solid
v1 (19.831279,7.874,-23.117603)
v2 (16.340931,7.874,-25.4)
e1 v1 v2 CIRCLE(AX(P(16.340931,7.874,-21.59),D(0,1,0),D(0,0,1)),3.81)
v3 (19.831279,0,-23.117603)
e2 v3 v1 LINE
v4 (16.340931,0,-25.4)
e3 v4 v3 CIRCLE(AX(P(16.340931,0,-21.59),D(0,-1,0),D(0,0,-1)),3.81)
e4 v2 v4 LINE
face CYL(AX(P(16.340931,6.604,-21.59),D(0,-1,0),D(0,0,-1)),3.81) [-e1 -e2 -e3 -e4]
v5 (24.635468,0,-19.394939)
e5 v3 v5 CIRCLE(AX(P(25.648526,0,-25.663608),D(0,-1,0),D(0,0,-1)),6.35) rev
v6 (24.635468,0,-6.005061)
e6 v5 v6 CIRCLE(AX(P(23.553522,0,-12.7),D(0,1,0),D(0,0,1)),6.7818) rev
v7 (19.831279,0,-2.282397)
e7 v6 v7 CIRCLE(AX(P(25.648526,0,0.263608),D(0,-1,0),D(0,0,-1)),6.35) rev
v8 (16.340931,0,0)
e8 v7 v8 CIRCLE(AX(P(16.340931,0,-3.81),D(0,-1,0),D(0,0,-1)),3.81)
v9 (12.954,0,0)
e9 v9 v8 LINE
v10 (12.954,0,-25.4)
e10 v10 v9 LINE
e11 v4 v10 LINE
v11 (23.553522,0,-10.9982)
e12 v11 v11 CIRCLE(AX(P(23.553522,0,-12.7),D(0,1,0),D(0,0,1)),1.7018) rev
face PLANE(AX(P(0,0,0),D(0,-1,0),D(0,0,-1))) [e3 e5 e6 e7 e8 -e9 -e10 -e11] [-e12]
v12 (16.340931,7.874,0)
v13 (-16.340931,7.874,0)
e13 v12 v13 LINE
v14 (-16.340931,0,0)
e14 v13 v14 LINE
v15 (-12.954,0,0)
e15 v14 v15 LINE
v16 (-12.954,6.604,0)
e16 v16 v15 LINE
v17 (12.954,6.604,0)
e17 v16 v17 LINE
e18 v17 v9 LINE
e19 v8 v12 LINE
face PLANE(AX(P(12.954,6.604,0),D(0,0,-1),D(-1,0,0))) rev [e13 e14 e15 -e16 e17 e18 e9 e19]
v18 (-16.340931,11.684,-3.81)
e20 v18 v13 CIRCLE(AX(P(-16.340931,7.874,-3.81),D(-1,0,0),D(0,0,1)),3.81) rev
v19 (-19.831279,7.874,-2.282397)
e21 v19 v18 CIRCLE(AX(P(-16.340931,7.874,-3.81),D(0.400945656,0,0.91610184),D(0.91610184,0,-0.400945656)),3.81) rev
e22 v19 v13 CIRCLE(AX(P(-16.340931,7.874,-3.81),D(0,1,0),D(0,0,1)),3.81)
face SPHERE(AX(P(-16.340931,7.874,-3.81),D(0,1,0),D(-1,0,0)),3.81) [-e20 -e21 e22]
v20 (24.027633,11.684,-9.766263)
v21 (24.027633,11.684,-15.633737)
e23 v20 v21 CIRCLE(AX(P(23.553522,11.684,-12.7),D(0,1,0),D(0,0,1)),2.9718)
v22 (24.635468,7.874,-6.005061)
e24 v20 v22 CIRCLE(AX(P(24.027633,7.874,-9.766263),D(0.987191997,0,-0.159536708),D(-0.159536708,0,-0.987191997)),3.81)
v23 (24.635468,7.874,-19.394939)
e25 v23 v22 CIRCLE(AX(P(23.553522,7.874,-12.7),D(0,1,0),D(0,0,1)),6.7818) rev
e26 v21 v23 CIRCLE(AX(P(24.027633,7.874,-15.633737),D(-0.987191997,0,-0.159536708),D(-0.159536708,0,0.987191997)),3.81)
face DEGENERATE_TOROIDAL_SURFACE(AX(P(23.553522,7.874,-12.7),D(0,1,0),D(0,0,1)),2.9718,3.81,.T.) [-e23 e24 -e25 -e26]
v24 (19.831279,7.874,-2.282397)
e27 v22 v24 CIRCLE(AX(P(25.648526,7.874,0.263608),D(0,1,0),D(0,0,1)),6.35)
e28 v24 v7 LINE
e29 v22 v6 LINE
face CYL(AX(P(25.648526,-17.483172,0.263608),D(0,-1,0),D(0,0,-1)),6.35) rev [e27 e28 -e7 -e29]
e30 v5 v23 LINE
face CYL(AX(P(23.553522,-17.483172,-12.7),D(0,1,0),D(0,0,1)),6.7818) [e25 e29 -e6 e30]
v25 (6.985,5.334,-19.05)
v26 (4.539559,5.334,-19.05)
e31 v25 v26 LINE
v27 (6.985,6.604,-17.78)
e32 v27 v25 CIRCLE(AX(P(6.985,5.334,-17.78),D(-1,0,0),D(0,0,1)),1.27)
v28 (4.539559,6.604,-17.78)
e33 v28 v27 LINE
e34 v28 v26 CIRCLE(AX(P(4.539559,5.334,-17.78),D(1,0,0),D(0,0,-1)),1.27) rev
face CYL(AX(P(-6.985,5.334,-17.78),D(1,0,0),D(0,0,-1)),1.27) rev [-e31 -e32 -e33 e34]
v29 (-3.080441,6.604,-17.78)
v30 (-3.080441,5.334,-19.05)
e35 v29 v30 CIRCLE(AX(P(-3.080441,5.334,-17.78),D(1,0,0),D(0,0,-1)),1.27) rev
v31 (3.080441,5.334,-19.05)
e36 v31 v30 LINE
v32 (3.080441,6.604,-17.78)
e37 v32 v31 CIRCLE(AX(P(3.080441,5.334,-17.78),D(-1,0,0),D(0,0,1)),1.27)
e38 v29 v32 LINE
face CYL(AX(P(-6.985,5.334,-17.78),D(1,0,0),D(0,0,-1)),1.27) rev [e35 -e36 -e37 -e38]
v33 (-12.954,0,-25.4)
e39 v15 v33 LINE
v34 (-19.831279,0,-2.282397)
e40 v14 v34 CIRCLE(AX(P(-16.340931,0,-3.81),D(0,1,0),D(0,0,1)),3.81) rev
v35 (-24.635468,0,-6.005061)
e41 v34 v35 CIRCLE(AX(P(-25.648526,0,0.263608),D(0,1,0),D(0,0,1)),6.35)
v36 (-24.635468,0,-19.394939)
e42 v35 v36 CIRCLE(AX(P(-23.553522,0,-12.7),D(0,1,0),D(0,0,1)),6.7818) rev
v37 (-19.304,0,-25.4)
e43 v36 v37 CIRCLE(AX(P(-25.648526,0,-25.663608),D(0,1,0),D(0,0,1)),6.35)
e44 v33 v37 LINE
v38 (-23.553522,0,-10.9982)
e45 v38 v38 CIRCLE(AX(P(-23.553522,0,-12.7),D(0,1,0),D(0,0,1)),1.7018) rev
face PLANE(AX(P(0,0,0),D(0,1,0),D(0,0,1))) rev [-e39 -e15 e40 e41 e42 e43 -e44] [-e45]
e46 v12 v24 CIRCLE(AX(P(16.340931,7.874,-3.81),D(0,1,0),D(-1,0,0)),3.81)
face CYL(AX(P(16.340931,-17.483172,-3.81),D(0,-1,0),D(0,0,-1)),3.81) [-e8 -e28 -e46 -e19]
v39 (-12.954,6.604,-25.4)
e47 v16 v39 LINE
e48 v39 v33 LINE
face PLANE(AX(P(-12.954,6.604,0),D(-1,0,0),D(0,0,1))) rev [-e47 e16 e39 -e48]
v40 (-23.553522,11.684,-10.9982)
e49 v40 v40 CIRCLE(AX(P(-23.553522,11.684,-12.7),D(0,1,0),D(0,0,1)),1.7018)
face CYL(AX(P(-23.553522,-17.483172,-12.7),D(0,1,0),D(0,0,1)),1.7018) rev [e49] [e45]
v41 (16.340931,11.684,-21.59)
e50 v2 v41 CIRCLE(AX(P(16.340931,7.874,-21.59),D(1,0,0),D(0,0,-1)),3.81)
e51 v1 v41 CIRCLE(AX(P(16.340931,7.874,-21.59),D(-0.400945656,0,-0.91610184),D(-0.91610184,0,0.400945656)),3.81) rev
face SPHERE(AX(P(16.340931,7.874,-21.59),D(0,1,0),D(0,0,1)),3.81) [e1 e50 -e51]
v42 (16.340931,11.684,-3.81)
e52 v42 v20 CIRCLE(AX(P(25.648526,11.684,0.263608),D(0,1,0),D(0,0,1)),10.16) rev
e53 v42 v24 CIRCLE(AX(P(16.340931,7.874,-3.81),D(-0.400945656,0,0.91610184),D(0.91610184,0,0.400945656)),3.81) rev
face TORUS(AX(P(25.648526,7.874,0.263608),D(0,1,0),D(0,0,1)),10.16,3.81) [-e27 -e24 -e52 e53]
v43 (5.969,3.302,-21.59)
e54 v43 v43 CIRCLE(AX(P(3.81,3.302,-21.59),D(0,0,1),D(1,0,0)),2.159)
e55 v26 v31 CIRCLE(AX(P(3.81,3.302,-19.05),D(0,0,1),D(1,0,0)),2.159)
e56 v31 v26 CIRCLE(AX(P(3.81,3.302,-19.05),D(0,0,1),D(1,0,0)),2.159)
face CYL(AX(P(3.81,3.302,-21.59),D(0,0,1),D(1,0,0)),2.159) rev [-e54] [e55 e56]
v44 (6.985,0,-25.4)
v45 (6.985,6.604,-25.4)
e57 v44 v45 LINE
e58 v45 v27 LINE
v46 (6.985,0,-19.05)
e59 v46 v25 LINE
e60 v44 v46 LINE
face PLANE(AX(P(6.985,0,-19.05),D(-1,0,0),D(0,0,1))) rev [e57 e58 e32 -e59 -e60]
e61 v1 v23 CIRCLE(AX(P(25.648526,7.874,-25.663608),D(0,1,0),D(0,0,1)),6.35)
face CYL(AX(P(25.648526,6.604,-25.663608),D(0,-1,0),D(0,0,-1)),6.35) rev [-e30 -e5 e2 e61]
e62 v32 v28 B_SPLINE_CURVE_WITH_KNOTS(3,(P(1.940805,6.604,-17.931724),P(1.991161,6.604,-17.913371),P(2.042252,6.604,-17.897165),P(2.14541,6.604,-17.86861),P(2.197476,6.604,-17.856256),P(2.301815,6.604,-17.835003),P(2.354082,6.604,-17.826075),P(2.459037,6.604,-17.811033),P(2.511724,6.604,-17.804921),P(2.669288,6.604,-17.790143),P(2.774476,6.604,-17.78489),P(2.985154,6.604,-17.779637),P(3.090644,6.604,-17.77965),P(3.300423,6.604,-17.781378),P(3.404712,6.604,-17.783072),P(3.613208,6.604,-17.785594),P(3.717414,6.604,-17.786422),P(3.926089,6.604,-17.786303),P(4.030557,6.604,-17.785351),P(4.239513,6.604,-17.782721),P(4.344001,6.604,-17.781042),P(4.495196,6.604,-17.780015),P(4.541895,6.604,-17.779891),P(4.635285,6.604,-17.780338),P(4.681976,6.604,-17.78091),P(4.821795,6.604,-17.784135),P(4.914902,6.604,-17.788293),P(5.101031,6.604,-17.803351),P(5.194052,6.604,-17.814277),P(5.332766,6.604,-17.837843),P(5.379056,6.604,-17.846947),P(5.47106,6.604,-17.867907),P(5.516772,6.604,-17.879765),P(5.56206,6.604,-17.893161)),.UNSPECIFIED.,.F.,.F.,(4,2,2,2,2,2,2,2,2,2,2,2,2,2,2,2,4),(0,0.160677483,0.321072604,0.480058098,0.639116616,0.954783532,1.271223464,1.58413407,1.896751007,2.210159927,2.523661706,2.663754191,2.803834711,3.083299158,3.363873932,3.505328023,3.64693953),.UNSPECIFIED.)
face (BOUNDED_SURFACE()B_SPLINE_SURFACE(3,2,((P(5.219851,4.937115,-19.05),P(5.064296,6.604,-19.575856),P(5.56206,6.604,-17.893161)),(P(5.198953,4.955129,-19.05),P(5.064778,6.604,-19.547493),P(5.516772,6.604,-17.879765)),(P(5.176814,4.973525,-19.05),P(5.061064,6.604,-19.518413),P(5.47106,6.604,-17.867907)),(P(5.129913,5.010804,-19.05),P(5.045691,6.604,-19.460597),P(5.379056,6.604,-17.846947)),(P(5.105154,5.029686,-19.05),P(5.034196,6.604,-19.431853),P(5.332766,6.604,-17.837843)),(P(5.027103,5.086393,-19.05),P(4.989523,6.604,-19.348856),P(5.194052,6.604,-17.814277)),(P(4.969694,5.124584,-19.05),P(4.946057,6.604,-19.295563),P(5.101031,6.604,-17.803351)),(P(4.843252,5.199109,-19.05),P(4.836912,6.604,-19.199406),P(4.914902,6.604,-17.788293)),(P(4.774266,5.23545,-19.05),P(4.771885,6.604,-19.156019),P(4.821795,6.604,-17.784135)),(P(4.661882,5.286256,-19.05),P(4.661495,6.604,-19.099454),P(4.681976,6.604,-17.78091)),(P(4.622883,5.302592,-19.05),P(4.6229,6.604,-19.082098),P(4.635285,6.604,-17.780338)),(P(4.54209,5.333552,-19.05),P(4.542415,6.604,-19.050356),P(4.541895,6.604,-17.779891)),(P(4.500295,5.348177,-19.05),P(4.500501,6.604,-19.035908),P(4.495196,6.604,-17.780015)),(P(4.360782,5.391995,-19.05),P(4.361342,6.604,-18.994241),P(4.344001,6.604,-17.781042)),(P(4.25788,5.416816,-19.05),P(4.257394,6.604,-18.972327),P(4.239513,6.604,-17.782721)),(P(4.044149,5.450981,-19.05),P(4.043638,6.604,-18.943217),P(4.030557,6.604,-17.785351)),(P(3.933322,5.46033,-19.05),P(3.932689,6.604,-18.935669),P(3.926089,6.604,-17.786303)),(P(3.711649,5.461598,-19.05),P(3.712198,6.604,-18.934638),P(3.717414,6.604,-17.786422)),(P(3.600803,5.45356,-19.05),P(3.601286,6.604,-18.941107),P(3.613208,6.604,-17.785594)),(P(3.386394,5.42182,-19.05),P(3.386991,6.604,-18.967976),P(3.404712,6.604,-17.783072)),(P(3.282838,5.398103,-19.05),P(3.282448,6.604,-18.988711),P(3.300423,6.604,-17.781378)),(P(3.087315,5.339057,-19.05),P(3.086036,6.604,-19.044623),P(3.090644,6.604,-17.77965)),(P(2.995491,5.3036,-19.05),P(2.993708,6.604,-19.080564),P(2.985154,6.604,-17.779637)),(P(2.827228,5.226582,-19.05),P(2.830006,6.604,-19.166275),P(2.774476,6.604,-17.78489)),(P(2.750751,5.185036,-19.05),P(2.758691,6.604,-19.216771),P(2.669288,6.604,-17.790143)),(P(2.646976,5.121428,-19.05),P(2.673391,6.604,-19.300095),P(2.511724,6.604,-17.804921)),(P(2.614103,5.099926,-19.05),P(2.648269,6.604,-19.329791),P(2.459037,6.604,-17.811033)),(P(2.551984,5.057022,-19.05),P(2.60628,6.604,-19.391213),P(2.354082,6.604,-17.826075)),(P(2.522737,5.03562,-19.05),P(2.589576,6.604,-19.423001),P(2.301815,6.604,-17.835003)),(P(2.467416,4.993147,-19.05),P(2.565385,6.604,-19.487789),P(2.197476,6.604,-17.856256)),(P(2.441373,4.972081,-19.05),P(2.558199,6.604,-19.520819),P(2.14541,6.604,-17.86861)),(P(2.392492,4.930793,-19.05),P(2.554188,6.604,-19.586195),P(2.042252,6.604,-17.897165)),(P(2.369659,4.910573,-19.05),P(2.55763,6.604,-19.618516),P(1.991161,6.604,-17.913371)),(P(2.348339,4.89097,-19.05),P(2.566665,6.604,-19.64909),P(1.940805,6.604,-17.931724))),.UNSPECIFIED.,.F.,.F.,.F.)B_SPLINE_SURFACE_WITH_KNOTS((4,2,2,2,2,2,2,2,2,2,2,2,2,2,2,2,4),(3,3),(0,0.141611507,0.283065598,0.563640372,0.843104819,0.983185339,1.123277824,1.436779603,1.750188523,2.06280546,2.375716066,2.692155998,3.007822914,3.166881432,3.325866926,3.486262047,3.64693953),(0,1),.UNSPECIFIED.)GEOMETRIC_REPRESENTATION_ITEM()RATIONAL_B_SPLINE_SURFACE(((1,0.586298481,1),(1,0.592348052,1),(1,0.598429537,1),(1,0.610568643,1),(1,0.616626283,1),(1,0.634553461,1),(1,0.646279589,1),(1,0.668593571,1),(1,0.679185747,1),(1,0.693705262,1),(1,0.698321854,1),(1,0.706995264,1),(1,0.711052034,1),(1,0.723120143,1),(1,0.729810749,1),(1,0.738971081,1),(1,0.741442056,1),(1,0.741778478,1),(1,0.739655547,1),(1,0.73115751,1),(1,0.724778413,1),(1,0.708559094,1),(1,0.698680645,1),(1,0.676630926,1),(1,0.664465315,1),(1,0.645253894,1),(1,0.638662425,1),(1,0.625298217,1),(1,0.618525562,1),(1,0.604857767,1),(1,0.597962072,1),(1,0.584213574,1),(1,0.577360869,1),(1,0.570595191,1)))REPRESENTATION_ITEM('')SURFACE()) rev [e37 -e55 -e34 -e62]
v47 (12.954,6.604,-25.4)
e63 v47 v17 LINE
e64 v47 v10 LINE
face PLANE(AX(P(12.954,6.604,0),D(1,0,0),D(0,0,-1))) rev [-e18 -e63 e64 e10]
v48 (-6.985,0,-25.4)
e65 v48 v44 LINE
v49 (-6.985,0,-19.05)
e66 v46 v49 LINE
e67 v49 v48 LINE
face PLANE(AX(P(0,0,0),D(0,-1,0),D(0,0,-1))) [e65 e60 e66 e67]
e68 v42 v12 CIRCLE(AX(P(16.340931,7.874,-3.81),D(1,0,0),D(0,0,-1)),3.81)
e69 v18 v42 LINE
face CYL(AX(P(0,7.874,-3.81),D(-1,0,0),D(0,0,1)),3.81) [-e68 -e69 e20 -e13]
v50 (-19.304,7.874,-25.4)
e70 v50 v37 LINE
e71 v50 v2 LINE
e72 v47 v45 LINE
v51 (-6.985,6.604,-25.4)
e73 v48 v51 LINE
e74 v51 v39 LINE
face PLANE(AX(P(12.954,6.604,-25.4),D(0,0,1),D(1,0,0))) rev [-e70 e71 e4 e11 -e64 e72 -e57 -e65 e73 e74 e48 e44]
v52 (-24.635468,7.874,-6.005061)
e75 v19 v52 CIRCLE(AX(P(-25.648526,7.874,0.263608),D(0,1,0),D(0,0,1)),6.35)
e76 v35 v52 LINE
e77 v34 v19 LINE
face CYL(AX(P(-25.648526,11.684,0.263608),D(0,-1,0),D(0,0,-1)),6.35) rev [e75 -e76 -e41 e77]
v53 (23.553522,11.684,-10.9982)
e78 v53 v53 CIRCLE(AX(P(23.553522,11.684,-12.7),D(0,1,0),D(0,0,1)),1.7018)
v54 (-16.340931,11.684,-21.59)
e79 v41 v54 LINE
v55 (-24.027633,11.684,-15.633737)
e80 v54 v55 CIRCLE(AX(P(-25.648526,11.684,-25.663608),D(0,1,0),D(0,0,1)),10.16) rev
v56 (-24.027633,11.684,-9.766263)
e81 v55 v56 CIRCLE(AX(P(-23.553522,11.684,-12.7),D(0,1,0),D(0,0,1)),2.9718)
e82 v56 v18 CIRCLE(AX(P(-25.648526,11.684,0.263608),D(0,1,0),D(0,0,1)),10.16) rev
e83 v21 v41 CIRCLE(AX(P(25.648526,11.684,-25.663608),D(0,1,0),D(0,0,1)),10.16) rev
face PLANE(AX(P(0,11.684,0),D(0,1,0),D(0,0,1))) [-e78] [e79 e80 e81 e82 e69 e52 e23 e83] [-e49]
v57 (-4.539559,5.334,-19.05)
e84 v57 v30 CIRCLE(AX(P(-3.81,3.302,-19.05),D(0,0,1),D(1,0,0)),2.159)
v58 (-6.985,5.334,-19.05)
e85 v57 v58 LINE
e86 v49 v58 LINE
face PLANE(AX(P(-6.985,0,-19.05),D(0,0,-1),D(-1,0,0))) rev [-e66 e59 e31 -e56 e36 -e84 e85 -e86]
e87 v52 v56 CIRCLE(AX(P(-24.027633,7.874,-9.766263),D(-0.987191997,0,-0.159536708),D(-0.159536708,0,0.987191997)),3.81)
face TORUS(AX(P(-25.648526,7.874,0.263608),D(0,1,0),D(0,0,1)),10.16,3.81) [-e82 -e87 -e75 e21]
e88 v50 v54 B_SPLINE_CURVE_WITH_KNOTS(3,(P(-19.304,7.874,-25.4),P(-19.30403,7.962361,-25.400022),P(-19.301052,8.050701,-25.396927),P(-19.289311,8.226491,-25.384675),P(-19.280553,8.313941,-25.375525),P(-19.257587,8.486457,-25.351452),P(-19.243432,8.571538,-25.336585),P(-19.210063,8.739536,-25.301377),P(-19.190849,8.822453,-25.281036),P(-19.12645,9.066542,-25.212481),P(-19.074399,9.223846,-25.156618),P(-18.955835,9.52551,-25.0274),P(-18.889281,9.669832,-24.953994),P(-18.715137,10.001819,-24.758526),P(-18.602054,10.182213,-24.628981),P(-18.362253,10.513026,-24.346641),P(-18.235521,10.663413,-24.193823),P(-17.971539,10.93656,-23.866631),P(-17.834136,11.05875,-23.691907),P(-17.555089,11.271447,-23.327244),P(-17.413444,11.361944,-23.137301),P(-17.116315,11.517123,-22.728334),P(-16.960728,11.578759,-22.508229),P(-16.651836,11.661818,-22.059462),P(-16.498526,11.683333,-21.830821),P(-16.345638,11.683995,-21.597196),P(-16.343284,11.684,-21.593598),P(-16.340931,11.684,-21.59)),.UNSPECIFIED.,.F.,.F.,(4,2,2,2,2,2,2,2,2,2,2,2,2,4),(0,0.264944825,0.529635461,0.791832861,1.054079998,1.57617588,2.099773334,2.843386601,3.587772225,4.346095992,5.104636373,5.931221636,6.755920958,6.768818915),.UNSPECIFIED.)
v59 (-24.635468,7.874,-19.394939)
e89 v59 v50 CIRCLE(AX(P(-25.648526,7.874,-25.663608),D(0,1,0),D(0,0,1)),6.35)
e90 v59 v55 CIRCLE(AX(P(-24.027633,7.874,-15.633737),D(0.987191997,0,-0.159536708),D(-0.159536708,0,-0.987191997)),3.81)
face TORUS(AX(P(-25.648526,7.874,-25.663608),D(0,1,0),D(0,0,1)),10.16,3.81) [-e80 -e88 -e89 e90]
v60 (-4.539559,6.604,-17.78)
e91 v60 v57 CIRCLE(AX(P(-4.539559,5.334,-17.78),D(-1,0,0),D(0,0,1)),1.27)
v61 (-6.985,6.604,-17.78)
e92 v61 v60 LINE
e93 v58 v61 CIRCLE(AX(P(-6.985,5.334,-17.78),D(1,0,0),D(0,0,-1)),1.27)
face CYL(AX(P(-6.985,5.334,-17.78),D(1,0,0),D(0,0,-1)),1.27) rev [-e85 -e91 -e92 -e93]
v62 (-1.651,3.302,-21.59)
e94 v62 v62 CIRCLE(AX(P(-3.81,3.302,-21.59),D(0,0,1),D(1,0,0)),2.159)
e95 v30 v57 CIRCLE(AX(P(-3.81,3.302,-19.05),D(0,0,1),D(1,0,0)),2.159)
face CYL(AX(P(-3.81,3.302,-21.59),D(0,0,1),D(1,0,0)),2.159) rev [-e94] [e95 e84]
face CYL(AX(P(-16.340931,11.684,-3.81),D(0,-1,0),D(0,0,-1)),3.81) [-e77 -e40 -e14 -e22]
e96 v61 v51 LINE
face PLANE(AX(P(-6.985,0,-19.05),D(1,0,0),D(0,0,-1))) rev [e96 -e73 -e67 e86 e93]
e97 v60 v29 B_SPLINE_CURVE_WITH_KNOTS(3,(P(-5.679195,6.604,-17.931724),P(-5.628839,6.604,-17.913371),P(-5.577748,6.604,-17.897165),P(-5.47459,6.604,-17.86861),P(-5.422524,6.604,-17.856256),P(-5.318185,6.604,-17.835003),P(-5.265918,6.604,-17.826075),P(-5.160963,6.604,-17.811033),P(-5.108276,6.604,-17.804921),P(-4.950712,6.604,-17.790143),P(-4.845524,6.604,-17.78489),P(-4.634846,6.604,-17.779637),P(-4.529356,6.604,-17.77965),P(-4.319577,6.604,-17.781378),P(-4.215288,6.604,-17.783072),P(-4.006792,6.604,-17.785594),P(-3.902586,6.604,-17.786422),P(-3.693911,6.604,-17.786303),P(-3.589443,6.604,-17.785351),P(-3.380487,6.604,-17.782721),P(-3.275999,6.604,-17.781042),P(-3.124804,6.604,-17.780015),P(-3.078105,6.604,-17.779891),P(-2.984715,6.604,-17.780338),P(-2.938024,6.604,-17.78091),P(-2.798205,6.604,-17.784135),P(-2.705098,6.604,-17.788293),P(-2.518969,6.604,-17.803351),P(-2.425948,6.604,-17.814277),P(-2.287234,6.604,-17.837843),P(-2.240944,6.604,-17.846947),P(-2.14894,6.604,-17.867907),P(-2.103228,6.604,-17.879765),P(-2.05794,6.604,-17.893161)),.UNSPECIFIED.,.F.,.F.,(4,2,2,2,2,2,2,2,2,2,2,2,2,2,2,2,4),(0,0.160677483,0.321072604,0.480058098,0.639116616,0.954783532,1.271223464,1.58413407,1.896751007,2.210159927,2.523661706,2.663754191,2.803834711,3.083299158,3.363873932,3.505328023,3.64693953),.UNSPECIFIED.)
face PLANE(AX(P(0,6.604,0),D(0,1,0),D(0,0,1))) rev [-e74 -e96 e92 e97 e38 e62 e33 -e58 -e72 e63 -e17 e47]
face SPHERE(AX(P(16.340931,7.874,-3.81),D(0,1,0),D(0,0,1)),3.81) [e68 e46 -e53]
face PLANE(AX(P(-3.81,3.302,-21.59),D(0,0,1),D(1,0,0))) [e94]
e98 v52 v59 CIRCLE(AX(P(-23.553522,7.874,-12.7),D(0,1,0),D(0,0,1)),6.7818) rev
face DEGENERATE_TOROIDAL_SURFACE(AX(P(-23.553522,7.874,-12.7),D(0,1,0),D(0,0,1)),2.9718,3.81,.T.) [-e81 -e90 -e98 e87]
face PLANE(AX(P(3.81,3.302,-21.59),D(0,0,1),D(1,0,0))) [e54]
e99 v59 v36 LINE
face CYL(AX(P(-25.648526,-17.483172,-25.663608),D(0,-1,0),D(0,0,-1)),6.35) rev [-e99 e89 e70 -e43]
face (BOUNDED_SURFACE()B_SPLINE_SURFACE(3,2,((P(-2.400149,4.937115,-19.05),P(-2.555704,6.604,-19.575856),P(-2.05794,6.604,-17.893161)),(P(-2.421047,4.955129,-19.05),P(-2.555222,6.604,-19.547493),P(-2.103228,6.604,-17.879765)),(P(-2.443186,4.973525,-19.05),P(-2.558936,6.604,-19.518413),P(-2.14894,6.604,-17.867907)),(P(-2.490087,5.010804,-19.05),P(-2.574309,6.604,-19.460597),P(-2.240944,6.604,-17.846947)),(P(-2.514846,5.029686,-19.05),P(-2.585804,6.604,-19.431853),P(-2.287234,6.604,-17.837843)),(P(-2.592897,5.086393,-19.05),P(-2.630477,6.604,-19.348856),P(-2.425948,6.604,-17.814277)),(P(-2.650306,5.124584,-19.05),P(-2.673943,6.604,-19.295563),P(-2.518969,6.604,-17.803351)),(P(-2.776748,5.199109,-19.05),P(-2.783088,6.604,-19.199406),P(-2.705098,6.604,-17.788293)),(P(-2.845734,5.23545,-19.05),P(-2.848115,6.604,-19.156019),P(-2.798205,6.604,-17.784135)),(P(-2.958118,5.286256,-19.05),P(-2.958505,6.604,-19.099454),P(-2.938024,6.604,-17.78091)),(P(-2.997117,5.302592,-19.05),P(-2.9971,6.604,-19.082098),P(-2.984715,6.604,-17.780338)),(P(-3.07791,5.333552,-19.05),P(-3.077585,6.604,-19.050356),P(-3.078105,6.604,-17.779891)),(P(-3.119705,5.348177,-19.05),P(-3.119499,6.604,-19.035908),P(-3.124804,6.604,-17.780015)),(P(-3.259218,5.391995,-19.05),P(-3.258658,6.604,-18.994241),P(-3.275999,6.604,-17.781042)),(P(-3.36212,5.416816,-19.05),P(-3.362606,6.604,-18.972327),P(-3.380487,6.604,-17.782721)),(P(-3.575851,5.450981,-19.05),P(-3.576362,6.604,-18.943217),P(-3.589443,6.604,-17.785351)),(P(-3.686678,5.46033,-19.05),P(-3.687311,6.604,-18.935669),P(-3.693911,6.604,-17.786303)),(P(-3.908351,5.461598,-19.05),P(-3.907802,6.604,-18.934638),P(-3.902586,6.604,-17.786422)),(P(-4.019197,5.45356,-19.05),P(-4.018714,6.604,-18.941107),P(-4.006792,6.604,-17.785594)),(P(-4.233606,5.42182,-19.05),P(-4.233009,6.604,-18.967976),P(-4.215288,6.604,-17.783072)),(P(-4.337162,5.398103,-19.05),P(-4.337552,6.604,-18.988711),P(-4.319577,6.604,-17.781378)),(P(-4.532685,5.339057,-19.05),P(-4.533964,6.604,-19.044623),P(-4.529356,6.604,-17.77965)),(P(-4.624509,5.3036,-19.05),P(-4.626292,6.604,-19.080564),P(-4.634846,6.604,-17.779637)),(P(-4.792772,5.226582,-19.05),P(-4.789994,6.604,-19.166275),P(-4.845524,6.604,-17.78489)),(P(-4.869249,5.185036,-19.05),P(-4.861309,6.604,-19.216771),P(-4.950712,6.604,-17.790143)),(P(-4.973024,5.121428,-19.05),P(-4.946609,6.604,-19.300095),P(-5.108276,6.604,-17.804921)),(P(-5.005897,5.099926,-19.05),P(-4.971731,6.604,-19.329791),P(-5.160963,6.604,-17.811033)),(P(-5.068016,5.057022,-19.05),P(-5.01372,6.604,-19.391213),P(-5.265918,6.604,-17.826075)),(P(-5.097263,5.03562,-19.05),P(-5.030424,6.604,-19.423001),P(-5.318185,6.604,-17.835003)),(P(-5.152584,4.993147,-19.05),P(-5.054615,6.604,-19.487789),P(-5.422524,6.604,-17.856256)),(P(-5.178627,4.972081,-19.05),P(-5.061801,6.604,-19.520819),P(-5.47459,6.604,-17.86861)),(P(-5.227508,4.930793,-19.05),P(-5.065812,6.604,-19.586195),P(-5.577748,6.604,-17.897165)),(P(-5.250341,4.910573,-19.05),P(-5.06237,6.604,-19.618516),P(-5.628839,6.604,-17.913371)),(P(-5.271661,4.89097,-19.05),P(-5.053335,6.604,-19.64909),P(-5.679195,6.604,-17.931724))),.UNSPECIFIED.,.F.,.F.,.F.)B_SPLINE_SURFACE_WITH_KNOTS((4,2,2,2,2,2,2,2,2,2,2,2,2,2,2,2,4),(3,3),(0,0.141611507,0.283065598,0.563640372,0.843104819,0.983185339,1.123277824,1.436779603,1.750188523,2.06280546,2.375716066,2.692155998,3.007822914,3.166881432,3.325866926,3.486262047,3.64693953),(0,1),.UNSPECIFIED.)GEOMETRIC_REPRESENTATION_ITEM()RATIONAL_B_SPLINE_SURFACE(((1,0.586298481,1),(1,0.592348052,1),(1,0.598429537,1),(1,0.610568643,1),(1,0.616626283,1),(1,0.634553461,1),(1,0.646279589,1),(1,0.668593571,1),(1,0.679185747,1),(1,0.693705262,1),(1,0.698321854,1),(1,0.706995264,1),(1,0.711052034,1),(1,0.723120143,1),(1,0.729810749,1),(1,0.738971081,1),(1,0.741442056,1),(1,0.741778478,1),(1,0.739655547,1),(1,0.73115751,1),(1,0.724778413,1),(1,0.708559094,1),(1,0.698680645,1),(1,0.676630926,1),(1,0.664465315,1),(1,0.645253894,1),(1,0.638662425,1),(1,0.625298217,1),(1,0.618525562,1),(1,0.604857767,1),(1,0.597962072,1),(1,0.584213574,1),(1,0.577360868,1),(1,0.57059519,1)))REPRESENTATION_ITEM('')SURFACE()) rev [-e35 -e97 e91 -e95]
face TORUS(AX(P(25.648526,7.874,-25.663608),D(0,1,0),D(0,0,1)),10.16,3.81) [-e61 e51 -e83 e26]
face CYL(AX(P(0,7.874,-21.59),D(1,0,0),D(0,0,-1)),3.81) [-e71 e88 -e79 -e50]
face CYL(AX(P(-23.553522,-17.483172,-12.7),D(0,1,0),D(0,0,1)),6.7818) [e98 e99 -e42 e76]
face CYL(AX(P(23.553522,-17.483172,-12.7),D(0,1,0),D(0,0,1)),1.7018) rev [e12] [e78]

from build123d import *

# Parameters (mm, degrees)
SKETCH1_W             = 6.35
SKETCH1_H             = 25.4
BOSS_EXTRUDE1_DEPTH   = 6.604
BOSS_EXTRUDE1_2_DEPTH = 6.604
SKETCH2_W             = 38.608
SKETCH2_H             = 25.4
BOSS_EXTRUDE2_DEPTH   = 5.08
SKETCH3_W             = 13.97
SKETCH3_H             = 6.35
BOSS_EXTRUDE3_DEPTH   = 6.604
SKETCH4_R             = 2.159
CUT_EXTRUDE1_DEPTH    = 2.54
SKETCH5_R             = 1.7018
BOSS_EXTRUDE4_DEPTH   = 11.684
FILLET1_R             = 6.35
FILLET2_R             = 3.81
FILLET3_R             = 1.27


with BuildPart() as part:
    # Sketch1 → Boss-Extrude1 (new body)
    with BuildSketch(Plane(origin=(0, 0, 0), x_dir=(1, 0, 0), z_dir=(0, 1, 0))):
        with Locations((16.129, 12.7)):
            Rectangle(SKETCH1_W, SKETCH1_H)
    extrude(amount=BOSS_EXTRUDE1_DEPTH)



with BuildPart() as body_2:
    # Sketch1 → Boss-Extrude1 2 (new body)
    with BuildSketch(Plane(origin=(0, 0, 0), x_dir=(1, 0, 0), z_dir=(0, 1, 0))):
        with Locations((-16.129, 12.7)):
            Rectangle(SKETCH1_W, SKETCH1_H)
    extrude(amount=BOSS_EXTRUDE1_2_DEPTH)


with BuildPart() as part_1:
    add(part.part)

    add(body_2.part)  # Boss-Extrude2 merges body 2
    # Sketch2 → Boss-Extrude2 (add)
    with BuildSketch(Plane(origin=(0, 6.604, 0), x_dir=(1, 0, 0), z_dir=(0, 1, 0))):
        with Locations((0, 12.7)):
            Rectangle(SKETCH2_W, SKETCH2_H)
    extrude(amount=BOSS_EXTRUDE2_DEPTH)

    # Sketch3 → Boss-Extrude3 (add)
    with BuildSketch(Plane.XZ.offset(-6.604)):
        with Locations((0, -22.225)):
            Rectangle(SKETCH3_W, SKETCH3_H)
    extrude(amount=BOSS_EXTRUDE3_DEPTH)

    # Sketch4 → Cut-Extrude1 (cut)
    with BuildSketch(Plane.XY.offset(-19.05)):
        with Locations((3.81, 3.302)):
            Circle(SKETCH4_R)
        with Locations((-3.81, 3.302)):
            Circle(SKETCH4_R)
    extrude(amount=-CUT_EXTRUDE1_DEPTH, mode=Mode.SUBTRACT)

    # Sketch5 → Boss-Extrude4 (add)
    # profile 1 of 2: a face of its own
    with BuildSketch(Plane(origin=(0, 11.684, 0), x_dir=(1, 0, 0), z_dir=(0, 1, 0))):
        with BuildLine():
            Line((-19.304, 17.985297981), (-19.304, 7.414702019))
            ThreePointArc((-19.304, 7.414702019), (-30.335321913, 12.7), (-19.304, 17.985297981))
        make_face()
        with Locations(Location((-23.553521913, 12.7, 0), (0, 0, 270))):
            Circle(SKETCH5_R, mode=Mode.SUBTRACT)
    # profile 2 of 2: a face of its own
    with BuildSketch(Plane(origin=(0, 11.684, 0), x_dir=(1, 0, 0), z_dir=(0, 1, 0))):
        with BuildLine():
            Line((19.304, 17.985297981), (19.304, 7.414702019))
            ThreePointArc((19.304, 7.414702019), (30.335321913, 12.7), (19.304, 17.985297981))
        make_face()
        with Locations(Location((23.553521913, 12.7, 0), (0, 0, 270))):
            Circle(SKETCH5_R, mode=Mode.SUBTRACT)
    extrude(amount=-BOSS_EXTRUDE4_DEPTH)

    # Fillet1
    # the kernel refuses this fillet: 6.35 mm, written as the material it adds along each edge
    with BuildSketch(Plane(origin=(-19.304, 11.684, -7.414702019), x_dir=(0, 0, 1), z_dir=(0, -1, 0)), Plane(origin=(19.304, 11.684, -17.985297981), x_dir=(0, 0, -1), z_dir=(0, -1, 0))) as fillet1_piece_1:
        with BuildLine():
            CenterArc((7.678309884, 6.344526057), FILLET1_R, 189.180006139, 78.44078763)
            Line((1.409640703, 5.331467961), (1.28426732, 5.311206799))
            ThreePointArc((1.28426732, 5.311206799), (1.148418354, 2.548446621), (-0.098975618, 0.079579062))
            Line((-0.098975618, 0.079579062), (0, -0.127))
            ThreePointArc((0, -0.127), (3.707351009, -0.127), (7.409429861, -0.126890521))
            Line((7.409429861, -0.126890521), (7.414702019, 0))
        make_face()
    extrude(amount=11.684)
    with BuildSketch(Plane(origin=(-19.304, 11.684, -17.985297981), x_dir=(0, 0, -1), z_dir=(0, -1, 0)), Plane(origin=(19.304, 11.684, -7.414702019), x_dir=(0, 0, 1), z_dir=(0, -1, 0))) as fillet1_piece_2:
        with BuildLine():
            CenterArc((7.678309884, -6.344526057), FILLET1_R, 92.379206231, 78.44078763)
            Line((1.409640703, -5.331467961), (1.28426732, -5.311206799))
            ThreePointArc((1.28426732, -5.311206799), (1.148418354, -2.548446621), (-0.098975618, -0.079579062))
            Line((-0.098975618, -0.079579062), (0, 0.127))
            ThreePointArc((0, 0.127), (3.707351009, 0.127), (7.409429861, 0.126890521))
            Line((7.409429861, 0.126890521), (7.414702019, 0))
        make_face()
    extrude(amount=11.684)

    # Fillet2
    fillet2_edges = [part_1.edges().sort_by_distance(p)[0] for p in [
        (20.899978754, 11.684, -21.447709562),
        (-19.304, 5.842, 0),
        (0, 11.684, 0),
        (0, 11.684, -25.4),
        (19.304, 5.842, 0),
        (19.304, 5.842, -25.4),
        (-30.335321913, 11.684, -12.7),
        (30.335321913, 11.684, -12.7),
        (-20.899978754, 11.684, -3.952290438),
        (-20.899978754, 11.684, -21.447709562),
        (20.899978754, 11.684, -3.952290438),
    ]]
    fillet(fillet2_edges, radius=FILLET2_R)

    # Fillet3
    fillet3_edges = [part_1.edges().sort_by_distance(p)[0] for p in [
        (0, 6.604, -19.05),
    ]]
    fillet(fillet3_edges, radius=FILLET3_R)


solid = part_1.part
